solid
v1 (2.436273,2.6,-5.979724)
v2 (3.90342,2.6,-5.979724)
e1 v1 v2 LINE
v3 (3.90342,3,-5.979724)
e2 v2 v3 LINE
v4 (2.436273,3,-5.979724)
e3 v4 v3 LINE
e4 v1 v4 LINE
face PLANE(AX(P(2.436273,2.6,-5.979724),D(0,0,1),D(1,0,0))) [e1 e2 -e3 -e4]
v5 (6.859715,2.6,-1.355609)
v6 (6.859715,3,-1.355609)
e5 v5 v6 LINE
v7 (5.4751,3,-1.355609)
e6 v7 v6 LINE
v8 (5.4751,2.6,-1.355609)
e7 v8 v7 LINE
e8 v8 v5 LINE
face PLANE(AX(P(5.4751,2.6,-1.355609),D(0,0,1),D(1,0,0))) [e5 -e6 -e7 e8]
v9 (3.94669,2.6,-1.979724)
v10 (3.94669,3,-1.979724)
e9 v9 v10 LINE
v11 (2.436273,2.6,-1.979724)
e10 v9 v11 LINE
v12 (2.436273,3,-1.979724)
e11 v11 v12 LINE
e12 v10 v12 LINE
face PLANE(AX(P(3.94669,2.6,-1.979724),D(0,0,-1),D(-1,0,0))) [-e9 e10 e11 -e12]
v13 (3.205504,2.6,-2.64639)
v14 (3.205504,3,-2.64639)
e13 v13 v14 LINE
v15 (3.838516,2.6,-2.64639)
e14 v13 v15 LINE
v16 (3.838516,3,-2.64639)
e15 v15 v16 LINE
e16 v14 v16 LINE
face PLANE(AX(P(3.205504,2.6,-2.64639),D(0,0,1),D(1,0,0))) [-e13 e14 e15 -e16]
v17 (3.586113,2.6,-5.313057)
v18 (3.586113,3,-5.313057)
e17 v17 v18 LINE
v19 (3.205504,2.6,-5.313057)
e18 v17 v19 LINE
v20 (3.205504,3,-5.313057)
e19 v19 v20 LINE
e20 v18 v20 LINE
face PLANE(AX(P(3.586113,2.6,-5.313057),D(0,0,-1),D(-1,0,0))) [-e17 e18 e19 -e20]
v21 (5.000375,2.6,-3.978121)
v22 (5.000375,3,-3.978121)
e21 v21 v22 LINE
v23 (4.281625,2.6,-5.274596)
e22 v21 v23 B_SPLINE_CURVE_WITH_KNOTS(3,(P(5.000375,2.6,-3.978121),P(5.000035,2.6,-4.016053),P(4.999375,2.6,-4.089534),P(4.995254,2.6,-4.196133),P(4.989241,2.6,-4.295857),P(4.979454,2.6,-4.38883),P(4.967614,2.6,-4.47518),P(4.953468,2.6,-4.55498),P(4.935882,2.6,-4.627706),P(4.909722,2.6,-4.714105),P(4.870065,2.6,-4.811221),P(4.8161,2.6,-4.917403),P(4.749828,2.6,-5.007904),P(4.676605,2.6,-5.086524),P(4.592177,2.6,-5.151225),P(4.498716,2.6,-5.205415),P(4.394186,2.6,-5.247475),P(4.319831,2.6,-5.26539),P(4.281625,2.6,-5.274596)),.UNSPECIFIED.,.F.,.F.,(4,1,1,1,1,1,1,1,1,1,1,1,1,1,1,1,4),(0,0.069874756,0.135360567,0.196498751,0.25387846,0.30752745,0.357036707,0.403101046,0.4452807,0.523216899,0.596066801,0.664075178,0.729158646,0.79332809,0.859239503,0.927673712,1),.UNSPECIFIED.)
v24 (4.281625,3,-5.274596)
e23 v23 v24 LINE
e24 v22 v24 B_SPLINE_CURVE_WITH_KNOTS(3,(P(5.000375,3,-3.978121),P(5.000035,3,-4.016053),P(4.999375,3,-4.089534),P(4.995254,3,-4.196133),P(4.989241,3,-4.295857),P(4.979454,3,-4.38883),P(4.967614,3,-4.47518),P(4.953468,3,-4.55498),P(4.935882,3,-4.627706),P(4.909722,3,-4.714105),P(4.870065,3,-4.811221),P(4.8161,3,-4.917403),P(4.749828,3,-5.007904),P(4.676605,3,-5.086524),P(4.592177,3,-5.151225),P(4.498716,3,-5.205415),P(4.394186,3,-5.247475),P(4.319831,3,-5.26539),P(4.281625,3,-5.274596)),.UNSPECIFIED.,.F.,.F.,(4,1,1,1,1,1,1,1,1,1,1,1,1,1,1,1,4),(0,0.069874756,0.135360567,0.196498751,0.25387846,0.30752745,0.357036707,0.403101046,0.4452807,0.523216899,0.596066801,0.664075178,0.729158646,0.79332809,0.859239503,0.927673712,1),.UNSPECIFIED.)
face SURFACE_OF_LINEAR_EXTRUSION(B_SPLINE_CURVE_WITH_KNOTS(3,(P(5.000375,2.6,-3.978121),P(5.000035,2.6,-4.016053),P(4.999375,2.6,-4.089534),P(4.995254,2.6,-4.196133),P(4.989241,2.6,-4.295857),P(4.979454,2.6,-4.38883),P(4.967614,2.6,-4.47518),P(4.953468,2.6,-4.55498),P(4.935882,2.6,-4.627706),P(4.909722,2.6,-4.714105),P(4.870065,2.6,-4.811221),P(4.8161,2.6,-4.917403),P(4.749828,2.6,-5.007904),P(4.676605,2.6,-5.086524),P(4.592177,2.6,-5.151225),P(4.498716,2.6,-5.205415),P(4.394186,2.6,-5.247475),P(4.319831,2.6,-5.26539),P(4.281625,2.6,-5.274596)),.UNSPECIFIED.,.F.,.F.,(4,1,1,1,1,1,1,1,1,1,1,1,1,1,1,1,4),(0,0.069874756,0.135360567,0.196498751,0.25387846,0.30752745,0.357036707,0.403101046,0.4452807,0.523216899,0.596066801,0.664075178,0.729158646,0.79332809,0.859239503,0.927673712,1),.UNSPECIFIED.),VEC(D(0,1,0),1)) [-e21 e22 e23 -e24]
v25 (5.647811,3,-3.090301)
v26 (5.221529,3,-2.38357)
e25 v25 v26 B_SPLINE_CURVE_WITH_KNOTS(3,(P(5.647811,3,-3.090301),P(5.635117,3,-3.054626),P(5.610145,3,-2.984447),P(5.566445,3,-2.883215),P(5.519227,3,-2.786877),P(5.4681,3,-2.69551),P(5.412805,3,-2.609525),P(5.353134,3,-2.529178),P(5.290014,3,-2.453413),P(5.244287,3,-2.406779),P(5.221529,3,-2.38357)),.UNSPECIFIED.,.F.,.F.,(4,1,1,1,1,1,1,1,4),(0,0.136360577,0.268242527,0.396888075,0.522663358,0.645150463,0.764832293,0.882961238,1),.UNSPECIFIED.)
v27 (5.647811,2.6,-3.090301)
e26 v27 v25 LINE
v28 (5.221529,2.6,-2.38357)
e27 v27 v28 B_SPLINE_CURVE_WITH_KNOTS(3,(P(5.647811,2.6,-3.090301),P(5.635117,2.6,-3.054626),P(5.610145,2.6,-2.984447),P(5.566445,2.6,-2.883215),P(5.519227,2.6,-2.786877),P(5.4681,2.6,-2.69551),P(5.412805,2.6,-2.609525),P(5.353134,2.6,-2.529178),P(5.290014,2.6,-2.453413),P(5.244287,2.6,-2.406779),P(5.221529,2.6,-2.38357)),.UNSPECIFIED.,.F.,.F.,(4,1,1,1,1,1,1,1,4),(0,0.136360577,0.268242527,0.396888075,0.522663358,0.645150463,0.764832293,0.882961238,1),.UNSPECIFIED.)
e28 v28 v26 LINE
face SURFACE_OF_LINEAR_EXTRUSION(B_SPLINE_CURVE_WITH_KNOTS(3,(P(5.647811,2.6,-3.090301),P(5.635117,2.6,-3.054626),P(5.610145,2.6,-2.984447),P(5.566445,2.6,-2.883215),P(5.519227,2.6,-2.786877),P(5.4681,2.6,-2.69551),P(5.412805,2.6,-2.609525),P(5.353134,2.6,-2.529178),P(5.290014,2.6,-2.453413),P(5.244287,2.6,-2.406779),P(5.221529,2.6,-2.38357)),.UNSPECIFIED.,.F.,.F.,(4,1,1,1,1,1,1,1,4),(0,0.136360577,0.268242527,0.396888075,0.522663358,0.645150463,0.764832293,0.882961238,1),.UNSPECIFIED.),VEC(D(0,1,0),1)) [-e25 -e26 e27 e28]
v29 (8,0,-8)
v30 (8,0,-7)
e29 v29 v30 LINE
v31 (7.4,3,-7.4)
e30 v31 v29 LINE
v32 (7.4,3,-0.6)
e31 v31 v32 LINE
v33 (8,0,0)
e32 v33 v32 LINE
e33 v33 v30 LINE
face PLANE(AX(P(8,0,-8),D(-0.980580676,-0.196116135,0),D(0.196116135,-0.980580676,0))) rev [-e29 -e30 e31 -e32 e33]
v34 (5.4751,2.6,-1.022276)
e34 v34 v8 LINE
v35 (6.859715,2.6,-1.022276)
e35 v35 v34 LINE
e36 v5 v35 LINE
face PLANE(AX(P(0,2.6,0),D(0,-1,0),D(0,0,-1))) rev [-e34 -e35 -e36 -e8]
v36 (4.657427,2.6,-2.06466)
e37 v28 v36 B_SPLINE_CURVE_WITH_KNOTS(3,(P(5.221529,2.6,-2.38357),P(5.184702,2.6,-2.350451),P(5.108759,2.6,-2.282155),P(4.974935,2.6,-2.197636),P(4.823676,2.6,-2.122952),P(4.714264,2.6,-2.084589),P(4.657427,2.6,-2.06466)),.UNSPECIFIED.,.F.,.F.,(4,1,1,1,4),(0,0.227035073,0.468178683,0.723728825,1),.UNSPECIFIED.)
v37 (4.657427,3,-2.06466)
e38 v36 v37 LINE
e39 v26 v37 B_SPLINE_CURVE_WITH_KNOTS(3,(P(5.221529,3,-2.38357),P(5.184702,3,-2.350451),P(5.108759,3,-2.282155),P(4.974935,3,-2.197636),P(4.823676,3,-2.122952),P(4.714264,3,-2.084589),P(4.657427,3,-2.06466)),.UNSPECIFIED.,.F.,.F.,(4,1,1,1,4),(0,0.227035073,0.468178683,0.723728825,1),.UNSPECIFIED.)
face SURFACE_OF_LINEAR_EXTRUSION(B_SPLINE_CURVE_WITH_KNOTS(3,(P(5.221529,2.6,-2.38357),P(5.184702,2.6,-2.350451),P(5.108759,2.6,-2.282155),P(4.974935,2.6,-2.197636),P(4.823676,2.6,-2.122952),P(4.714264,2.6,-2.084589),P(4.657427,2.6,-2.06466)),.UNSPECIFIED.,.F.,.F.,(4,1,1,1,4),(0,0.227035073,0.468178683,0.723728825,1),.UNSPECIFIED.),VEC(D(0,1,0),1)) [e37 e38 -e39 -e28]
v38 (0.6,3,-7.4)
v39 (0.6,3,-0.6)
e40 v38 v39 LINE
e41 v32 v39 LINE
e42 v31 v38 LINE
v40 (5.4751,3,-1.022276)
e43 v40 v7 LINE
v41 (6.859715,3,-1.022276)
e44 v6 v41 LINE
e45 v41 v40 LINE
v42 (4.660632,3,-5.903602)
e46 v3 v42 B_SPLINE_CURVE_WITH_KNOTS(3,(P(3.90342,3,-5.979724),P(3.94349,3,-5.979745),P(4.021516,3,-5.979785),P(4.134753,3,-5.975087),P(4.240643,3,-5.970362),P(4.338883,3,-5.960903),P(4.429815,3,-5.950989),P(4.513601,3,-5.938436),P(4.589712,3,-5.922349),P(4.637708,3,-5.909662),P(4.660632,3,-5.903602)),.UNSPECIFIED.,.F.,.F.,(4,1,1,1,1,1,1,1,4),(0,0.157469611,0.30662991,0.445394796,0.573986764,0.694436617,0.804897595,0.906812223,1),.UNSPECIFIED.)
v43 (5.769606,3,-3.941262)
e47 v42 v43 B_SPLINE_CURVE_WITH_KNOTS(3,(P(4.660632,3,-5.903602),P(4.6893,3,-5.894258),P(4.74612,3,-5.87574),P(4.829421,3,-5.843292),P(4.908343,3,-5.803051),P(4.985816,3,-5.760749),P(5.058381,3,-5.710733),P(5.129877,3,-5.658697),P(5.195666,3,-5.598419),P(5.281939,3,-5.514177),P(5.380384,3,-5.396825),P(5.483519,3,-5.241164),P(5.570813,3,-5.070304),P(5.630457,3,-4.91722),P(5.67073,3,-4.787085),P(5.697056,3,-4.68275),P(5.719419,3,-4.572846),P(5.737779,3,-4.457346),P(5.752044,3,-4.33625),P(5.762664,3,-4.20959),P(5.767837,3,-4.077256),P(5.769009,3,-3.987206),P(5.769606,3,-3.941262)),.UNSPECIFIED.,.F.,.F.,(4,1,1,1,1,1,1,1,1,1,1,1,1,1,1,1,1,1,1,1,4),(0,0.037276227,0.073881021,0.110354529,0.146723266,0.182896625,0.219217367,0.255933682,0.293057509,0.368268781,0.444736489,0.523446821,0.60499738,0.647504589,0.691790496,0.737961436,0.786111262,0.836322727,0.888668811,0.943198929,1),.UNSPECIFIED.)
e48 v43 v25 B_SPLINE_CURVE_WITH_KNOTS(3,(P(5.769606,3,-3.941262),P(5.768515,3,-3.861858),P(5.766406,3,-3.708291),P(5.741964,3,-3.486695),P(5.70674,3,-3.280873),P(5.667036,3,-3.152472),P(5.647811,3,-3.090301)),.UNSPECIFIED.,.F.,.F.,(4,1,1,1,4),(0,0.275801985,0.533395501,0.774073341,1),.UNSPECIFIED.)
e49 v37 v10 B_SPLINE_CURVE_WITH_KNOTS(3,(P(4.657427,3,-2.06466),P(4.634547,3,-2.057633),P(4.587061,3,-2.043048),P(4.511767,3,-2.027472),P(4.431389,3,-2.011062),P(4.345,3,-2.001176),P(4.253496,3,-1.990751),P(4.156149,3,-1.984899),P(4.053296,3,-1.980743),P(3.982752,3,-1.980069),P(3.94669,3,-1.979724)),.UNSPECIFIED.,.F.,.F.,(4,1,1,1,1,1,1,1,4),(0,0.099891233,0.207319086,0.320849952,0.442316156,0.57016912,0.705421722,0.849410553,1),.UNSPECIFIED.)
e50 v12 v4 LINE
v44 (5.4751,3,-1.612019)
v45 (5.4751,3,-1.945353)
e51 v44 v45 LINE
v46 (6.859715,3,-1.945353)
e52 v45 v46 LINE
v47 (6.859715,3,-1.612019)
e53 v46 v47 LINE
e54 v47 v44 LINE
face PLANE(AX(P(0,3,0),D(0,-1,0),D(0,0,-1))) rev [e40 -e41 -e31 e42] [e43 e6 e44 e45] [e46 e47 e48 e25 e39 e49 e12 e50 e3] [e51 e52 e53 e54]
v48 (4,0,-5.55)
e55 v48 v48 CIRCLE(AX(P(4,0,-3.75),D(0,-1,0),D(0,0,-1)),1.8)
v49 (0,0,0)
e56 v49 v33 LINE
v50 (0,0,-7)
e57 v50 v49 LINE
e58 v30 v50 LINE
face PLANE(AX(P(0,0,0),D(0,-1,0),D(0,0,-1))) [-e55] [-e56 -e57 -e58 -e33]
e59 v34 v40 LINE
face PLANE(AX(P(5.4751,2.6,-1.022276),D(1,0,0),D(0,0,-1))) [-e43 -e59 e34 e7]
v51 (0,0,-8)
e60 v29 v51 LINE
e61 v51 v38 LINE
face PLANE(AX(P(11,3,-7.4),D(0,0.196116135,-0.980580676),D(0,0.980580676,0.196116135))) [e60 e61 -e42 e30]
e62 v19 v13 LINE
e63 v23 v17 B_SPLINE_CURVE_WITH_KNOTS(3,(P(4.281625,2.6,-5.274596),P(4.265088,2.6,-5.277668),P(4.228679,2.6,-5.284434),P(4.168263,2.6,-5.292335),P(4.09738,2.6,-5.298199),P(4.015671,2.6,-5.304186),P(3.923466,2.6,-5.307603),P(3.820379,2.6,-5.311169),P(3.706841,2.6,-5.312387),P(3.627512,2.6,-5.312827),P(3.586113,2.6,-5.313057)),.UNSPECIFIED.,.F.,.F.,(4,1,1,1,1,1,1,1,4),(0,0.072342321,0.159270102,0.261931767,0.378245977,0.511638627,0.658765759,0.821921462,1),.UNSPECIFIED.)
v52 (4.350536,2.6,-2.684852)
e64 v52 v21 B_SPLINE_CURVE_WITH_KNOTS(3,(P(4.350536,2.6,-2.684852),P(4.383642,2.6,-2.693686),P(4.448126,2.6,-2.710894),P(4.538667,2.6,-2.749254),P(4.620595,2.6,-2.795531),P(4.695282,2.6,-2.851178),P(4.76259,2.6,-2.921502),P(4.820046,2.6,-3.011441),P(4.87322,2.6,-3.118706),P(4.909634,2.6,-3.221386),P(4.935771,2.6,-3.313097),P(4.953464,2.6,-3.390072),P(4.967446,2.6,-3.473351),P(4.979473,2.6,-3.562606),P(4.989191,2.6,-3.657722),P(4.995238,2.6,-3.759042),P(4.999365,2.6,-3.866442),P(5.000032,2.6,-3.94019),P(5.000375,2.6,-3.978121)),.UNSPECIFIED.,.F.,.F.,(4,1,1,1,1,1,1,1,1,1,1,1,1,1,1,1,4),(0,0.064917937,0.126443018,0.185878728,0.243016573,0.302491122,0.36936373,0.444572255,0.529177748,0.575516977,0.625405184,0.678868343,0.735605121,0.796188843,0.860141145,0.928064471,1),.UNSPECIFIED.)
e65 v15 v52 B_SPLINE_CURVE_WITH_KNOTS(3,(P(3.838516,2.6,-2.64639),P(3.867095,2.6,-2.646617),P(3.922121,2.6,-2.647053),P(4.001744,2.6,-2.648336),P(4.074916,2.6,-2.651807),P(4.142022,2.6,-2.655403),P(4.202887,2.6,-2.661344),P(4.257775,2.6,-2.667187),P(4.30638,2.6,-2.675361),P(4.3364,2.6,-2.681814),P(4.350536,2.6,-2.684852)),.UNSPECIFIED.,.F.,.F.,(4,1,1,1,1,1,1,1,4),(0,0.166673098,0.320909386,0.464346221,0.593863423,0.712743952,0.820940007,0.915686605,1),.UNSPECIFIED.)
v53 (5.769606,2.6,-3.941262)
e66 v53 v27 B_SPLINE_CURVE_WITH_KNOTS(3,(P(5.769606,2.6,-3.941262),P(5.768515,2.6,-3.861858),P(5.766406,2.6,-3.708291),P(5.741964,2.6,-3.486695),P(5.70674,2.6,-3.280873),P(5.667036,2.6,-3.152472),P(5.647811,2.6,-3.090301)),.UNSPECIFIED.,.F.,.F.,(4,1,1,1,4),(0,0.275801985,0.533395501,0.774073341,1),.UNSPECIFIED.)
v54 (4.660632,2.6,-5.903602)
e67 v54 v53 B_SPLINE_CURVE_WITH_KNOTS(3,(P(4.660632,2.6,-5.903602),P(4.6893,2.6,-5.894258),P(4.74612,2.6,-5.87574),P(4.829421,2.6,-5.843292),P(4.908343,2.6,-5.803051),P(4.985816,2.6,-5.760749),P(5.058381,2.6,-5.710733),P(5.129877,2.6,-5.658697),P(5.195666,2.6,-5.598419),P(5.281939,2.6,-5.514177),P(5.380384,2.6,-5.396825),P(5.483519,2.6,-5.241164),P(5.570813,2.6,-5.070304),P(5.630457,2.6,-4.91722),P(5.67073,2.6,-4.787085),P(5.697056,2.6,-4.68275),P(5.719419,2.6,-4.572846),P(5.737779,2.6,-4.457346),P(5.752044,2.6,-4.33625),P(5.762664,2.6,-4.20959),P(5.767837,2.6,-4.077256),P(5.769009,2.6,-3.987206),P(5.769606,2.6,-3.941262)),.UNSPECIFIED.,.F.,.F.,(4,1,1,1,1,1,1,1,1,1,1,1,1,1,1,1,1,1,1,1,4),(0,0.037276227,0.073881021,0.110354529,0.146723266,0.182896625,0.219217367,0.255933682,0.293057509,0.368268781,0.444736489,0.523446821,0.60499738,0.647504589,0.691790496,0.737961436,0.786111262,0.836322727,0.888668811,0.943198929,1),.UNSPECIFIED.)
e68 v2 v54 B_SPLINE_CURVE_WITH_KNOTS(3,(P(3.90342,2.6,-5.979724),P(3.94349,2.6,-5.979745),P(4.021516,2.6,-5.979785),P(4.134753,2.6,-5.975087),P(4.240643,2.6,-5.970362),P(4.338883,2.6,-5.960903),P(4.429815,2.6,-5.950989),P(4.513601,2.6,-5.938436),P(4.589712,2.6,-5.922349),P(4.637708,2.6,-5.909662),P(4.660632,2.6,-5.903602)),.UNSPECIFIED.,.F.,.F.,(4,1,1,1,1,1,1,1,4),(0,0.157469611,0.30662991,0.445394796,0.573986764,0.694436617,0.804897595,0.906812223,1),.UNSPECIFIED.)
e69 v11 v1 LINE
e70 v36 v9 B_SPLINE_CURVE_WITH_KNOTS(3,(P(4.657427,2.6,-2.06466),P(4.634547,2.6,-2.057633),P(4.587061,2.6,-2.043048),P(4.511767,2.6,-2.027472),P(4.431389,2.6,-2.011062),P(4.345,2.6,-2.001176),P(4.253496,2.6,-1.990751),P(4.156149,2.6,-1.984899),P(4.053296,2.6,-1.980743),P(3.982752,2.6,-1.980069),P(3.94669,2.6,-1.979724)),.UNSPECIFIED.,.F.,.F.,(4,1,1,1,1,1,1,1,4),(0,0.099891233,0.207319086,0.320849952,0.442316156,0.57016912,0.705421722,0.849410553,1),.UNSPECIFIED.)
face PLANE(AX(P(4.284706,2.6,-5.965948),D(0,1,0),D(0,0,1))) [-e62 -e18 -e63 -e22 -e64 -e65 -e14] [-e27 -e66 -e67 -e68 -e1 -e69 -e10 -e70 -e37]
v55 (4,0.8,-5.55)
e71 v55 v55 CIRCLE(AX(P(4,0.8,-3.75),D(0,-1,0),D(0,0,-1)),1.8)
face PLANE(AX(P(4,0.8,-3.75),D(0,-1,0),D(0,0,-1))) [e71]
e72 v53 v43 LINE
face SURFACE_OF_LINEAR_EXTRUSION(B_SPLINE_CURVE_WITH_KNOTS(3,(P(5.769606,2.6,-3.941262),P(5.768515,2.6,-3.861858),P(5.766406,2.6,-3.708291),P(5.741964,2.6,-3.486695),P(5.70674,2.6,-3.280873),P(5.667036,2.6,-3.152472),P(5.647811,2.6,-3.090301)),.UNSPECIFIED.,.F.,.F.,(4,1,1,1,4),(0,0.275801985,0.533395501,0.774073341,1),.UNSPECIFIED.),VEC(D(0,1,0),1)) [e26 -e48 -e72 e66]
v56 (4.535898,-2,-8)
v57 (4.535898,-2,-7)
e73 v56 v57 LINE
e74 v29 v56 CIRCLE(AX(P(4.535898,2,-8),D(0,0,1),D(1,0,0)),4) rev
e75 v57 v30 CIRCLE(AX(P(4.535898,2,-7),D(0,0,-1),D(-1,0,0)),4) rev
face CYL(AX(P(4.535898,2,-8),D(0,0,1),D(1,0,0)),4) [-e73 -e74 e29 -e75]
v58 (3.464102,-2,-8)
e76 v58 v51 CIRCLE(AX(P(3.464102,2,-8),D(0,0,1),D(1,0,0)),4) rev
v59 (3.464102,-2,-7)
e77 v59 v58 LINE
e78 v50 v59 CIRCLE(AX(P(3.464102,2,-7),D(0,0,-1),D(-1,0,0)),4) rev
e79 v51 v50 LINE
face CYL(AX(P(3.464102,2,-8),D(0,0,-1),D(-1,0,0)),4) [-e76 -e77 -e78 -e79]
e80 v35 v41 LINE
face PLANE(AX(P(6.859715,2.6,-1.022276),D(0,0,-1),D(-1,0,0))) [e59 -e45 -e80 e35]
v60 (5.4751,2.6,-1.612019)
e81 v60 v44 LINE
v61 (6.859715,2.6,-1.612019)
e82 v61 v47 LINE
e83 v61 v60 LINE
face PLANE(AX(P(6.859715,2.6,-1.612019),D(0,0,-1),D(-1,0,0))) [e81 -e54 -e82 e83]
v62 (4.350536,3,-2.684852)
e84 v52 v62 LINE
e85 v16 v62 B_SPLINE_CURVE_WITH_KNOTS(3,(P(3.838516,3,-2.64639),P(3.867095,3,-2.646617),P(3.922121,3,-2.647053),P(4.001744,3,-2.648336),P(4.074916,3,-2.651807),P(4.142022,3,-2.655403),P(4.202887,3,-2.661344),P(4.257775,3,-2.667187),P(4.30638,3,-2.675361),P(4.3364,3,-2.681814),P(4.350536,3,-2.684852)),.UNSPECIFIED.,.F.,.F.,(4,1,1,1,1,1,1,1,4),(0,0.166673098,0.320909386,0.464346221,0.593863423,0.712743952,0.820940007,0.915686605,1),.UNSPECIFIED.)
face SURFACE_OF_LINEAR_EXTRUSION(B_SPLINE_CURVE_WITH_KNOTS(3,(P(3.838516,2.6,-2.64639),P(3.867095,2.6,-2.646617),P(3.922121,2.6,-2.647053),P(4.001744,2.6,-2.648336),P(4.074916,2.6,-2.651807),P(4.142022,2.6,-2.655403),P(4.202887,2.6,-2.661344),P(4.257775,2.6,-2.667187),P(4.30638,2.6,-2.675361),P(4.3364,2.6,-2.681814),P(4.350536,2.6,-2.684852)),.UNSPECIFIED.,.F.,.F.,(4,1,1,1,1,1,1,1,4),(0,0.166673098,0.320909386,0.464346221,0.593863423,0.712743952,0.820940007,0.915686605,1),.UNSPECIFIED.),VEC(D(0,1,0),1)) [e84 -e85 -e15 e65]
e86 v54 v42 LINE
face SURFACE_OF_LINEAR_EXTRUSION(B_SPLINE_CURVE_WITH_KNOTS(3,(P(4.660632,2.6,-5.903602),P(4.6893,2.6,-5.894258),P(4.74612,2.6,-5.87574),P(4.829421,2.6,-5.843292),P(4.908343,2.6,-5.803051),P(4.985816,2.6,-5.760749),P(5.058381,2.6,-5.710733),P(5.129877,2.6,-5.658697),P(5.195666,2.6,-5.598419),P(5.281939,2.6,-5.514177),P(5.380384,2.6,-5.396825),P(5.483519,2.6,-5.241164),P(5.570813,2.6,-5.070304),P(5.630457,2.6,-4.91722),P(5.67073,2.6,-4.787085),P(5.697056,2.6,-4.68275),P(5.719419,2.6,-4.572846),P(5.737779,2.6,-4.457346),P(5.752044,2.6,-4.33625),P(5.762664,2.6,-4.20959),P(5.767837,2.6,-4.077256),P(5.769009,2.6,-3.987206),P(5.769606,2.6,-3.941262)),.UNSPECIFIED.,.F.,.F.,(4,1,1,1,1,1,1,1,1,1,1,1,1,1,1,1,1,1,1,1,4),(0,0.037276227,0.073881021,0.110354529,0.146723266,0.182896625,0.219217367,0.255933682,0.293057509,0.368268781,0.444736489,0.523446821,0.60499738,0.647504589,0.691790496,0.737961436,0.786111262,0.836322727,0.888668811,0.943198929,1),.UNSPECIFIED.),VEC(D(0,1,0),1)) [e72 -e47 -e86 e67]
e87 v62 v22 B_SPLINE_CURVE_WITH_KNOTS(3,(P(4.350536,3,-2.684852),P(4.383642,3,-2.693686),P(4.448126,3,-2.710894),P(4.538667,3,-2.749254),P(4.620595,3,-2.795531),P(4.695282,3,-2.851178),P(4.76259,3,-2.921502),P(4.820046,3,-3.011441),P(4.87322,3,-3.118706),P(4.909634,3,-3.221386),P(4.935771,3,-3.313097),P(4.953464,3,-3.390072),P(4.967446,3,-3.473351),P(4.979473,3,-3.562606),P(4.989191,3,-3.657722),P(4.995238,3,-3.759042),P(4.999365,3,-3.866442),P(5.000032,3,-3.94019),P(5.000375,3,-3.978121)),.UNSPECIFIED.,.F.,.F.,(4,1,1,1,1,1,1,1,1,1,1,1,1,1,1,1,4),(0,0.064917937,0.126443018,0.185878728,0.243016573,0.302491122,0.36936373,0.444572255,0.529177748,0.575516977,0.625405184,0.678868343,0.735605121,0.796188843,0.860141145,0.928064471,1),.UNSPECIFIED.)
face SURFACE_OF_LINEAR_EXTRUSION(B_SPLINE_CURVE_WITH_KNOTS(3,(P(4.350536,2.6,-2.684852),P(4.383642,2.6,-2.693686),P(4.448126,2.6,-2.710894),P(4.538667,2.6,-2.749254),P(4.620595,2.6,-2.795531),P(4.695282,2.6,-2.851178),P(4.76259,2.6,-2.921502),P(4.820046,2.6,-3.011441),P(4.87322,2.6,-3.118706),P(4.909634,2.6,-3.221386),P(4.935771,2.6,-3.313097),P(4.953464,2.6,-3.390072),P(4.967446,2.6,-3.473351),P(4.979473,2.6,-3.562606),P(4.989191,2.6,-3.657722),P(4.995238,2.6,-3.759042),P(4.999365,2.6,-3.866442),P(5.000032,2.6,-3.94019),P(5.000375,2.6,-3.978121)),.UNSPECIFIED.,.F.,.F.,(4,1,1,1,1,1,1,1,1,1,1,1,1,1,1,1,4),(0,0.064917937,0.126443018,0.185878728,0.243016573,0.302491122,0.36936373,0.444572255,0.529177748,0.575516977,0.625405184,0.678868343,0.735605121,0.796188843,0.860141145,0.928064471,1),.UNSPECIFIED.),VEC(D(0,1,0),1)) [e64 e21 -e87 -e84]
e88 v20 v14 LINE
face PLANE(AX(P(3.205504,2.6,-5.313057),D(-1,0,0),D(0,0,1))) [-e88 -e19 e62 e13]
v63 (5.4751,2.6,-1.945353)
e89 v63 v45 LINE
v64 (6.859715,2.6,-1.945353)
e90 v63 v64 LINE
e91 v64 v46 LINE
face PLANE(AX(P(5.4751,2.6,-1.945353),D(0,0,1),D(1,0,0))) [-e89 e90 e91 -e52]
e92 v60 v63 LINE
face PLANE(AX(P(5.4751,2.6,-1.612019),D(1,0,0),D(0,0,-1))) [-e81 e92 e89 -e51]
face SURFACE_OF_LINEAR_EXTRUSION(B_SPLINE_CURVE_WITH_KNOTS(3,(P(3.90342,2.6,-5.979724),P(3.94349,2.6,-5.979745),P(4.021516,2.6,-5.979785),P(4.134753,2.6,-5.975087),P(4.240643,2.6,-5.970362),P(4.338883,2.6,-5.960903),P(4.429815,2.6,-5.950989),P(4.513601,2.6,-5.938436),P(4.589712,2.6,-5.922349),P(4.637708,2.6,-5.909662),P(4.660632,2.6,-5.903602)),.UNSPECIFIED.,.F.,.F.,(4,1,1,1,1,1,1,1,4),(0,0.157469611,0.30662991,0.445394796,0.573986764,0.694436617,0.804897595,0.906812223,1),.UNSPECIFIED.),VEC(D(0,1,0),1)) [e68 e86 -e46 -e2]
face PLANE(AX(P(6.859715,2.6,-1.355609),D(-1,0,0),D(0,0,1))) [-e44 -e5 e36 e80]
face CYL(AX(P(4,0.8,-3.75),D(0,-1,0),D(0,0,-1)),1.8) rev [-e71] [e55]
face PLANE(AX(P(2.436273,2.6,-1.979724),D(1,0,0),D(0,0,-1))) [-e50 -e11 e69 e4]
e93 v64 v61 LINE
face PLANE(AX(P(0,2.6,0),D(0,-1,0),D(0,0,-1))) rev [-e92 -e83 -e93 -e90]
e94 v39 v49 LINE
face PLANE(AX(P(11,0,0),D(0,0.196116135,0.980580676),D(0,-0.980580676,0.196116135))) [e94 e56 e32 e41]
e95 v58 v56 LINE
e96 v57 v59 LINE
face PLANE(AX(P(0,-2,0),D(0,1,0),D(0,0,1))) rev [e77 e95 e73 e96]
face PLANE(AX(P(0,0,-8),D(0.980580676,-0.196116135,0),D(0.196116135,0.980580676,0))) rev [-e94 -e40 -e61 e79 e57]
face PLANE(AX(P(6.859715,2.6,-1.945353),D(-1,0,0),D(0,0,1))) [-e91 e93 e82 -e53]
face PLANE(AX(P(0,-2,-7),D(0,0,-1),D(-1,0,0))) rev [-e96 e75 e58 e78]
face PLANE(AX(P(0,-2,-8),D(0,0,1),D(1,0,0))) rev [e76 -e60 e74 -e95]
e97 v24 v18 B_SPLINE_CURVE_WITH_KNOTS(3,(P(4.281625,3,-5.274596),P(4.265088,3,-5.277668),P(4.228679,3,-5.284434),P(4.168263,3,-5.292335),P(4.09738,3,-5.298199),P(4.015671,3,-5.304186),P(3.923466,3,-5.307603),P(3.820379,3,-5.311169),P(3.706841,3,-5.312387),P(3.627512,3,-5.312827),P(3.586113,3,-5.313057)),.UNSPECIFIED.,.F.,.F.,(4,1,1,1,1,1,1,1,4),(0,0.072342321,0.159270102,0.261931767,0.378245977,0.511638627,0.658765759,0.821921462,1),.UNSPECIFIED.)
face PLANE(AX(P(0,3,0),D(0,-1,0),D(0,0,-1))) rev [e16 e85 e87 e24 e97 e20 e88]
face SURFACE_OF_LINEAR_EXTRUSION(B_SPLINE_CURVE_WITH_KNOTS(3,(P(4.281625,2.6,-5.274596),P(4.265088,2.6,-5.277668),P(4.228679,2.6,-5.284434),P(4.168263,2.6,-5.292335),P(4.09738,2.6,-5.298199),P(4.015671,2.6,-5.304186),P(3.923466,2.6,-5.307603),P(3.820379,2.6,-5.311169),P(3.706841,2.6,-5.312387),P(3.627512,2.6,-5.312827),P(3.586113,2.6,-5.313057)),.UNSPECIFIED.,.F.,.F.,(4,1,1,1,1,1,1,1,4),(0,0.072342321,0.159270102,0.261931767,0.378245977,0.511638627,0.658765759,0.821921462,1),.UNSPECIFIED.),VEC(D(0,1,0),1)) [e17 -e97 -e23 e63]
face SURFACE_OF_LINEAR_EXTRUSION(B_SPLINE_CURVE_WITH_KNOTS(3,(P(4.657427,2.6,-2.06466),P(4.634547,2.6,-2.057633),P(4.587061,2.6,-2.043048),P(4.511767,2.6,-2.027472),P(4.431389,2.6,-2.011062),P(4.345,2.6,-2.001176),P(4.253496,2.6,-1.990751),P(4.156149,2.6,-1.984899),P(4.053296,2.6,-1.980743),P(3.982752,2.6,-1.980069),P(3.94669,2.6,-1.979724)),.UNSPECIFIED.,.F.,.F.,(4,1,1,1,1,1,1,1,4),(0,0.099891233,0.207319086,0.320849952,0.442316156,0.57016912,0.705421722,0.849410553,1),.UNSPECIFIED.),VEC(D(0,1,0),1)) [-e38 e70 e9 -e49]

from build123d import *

# Parameters (mm, degrees)
SKETCH1_W               = 8
SKETCH1_H               = 8
BOSS_EXTRUDE1_DEPTH     = 3
CUT_EXTRUDE1_DEPTH      = 12.704699911
CUT_EXTRUDE1_DEPTH_BACK = 12.704699911
CUT_EXTRUDE2_DEPTH      = 11
SKETCH4_R               = 1.8
CUT_EXTRUDE3_DEPTH      = 0.8
SKETCH5_W               = 8
SKETCH5_H               = 1
BOSS_EXTRUDE2_DEPTH     = 2
FILLET1_R               = 4
CUT_EXTRUDE4_DEPTH      = 0.4
SKETCH7_W               = 1.384615385
SKETCH7_H               = 0.333333334
CUT_EXTRUDE5_DEPTH      = 0.4


with BuildPart() as part:
    # Sketch1 → Boss-Extrude1 (new body)
    with BuildSketch(Plane(origin=(0, 0, 0), x_dir=(1, 0, 0), z_dir=(0, 1, 0))):
        with Locations((4, 4)):
            Rectangle(SKETCH1_W, SKETCH1_H)
    extrude(amount=BOSS_EXTRUDE1_DEPTH)

    # Sketch2 → Cut-Extrude1 (cut, two sides: drawn at the far end of the back side and taken through both)
    with BuildSketch(Plane.XY.offset(-CUT_EXTRUDE1_DEPTH_BACK)):
        Polygon((0, 0), (0.6, 3), (0, 3), align=None)
        Polygon((8, 0), (7.4, 3), (8, 3), align=None)
    extrude(amount=CUT_EXTRUDE1_DEPTH + CUT_EXTRUDE1_DEPTH_BACK, mode=Mode.SUBTRACT)

    # Sketch3 → Cut-Extrude2 (cut)
    with BuildSketch(Plane(origin=(0, 0, 0), x_dir=(0, 0, -1), z_dir=(1, 0, 0))):
        Polygon((0, 0), (0.6, 3), (0, 3), align=None)
        Polygon((8, 3), (7.4, 3), (8, 0), align=None)
    extrude(amount=CUT_EXTRUDE2_DEPTH, mode=Mode.SUBTRACT)

    # Sketch4 → Cut-Extrude3 (cut)
    with BuildSketch(Plane.XZ):
        with Locations(Location((4, -3.75, 0), (0, 0, 270))):
            Circle(SKETCH4_R)
    extrude(amount=-CUT_EXTRUDE3_DEPTH, mode=Mode.SUBTRACT)

    # Sketch5 → Boss-Extrude2 (add)
    with BuildSketch(Plane.XZ):
        with Locations((4, -7.5)):
            Rectangle(SKETCH5_W, SKETCH5_H)
    extrude(amount=BOSS_EXTRUDE2_DEPTH)

    # Fillet1
    # the kernel refuses this fillet: 4 mm, written as the material it takes off along each edge
    with BuildSketch(Plane(origin=(8, -2, -16.660254038), x_dir=(0, 1, 0), z_dir=(0, 0, 1)), Plane(origin=(0, -2, 1.660254038), x_dir=(0, 1, 0), z_dir=(0, 0, -1))) as fillet1_piece_1:
        with BuildLine():
            CenterArc((4, 3.464101615), FILLET1_R, 180, 60)
            Line((0, 3.464101615), (-0.08, 3.464101615))
            Line((-0.08, 3.464101615), (-0.08, 0))
            Line((-0.08, 0), (0, -0.08))
            ThreePointArc((0, -0.08), (1, -0.08), (1.96, -0.069282032))
            Line((1.96, -0.069282032), (2, 0))
        make_face()
    extrude(amount=18.320508076, mode=Mode.SUBTRACT)

    # Sketch6 → Cut-Extrude4 (cut)
    with BuildSketch(Plane(origin=(0, 3, 0), x_dir=(1, 0, 0), z_dir=(0, 1, 0))):
        with BuildLine():
            Line((2.436272881, 5.979723732), (3.903420317, 5.979723732))
            add(Edge.make_bspline(
                [(3.903420317, 5.979723732), (3.943490496, 5.979744505), (4.021516441, 5.979784954), (4.134752515, 5.975087302), (4.240642802, 5.970362082), (4.338883372, 5.960903224), (4.429815049, 5.950988663), (4.51360101, 5.938436084), (4.589711972, 5.922348579), (4.637707501, 5.909661658), (4.660631856, 5.903601937)],
                knots=[0, 0, 0, 0, 1.259756885, 2.453039283, 3.563158368, 4.591894114, 5.55549294, 6.43918076, 7.254497783, 8, 8, 8, 8], degree=3))
            add(Edge.make_bspline(
                [(4.660631856, 5.903601937), (4.689300162, 5.894258489), (4.74612039, 5.87573989), (4.829420592, 5.843292221), (4.908343197, 5.803050568), (4.985816138, 5.760749105), (5.058380803, 5.710732544), (5.129877456, 5.658697008), (5.195666079, 5.598419283), (5.281939397, 5.514177193), (5.380383811, 5.396825298), (5.483519335, 5.241163905), (5.570813292, 5.070304112), (5.630456537, 4.917219685), (5.670729972, 4.787084992), (5.697056277, 4.682749965), (5.719418871, 4.572846322), (5.737778631, 4.457346355), (5.752043635, 4.336250048), (5.762664083, 4.209589679), (5.767837312, 4.07725583), (5.769008616, 3.987205692), (5.769606215, 3.941262194)],
                knots=[0, 0, 0, 0, 0.745524535, 1.477620414, 2.207090574, 2.934465325, 3.657932502, 4.384347339, 5.118673636, 5.861150177, 7.365375624, 8.894729774, 10.468936425, 12.099947606, 12.950091786, 13.83580991, 14.759228729, 15.722225242, 16.726454549, 17.773376212, 18.863978586, 20, 20, 20, 20], degree=3))
            add(Edge.make_bspline(
                [(5.769606215, 3.941262194), (5.768515323, 3.861857727), (5.766405561, 3.708291084), (5.741963835, 3.486695058), (5.70674022, 3.280872561), (5.667035899, 3.152471539), (5.647811343, 3.090300655)],
                knots=[0, 0, 0, 0, 1.103207939, 2.133582005, 3.096293362, 4, 4, 4, 4], degree=3))
            add(Edge.make_bspline(
                [(5.647811343, 3.090300655), (5.635116766, 3.054625647), (5.610144552, 2.98444734), (5.566445051, 2.883214788), (5.519227431, 2.786877042), (5.468100041, 2.695510004), (5.412804571, 2.609524646), (5.353134197, 2.529178156), (5.290013855, 2.453412746), (5.244286819, 2.406778778), (5.221529292, 2.383569886)],
                knots=[0, 0, 0, 0, 1.090884612, 2.145940218, 3.175104604, 4.181306866, 5.161203701, 6.118658341, 7.063689906, 8, 8, 8, 8], degree=3))
            add(Edge.make_bspline(
                [(5.221529292, 2.383569886), (5.184702113, 2.350450915), (5.108759222, 2.282154876), (4.974934842, 2.197635799), (4.823675662, 2.122952418), (4.714264019, 2.084588805), (4.657426727, 2.06465963)],
                knots=[0, 0, 0, 0, 0.908140292, 1.872714733, 2.8949153, 4, 4, 4, 4], degree=3))
            add(Edge.make_bspline(
                [(4.657426727, 2.06465963), (4.634546833, 2.057632533), (4.587060796, 2.043048157), (4.511767003, 2.027471741), (4.431388989, 2.011061834), (4.344999886, 2.001176252), (4.253496453, 1.990751469), (4.156149493, 1.984898536), (4.053296456, 1.980743294), (3.98275208, 1.980068625), (3.946689548, 1.979723732)],
                knots=[0, 0, 0, 0, 0.799129865, 1.658552685, 2.566799617, 3.538529252, 4.561352959, 5.643373779, 6.795284424, 8, 8, 8, 8], degree=3))
            Line((3.946689548, 1.979723732), (2.436272881, 1.979723732))
            Line((2.436272881, 1.979723732), (2.436272881, 5.979723732))
        make_face()
        with BuildLine():
            Line((3.205503651, 5.313057065), (3.205503651, 2.646390399))
            Line((3.205503651, 2.646390399), (3.838516471, 2.646390399))
            add(Edge.make_bspline(
                [(3.838516471, 2.646390399), (3.86709534, 2.646617049), (3.922120581, 2.647053436), (4.001743514, 2.648335709), (4.07491632, 2.651807064), (4.142022322, 2.655402822), (4.202886818, 2.661343643), (4.257774639, 2.667186667), (4.306380252, 2.675360935), (4.336400272, 2.681813595), (4.350535702, 2.684851937)],
                knots=[0, 0, 0, 0, 1.333384787, 2.567275092, 3.714769766, 4.750907381, 5.701951617, 6.567520054, 7.325492842, 8, 8, 8, 8], degree=3))
            add(Edge.make_bspline(
                [(4.350535702, 2.684851937), (4.38364248, 2.693686468), (4.44812575, 2.710893803), (4.538666782, 2.749253907), (4.62059475, 2.795531175), (4.695281698, 2.8511776), (4.762590099, 2.92150181), (4.820046047, 3.011440962), (4.873220012, 3.118706088), (4.909633556, 3.221385639), (4.935771128, 3.313096613), (4.95346412, 3.390071897), (4.967446413, 3.47335137), (4.979473009, 3.562606359), (4.989190784, 3.657722085), (4.995237644, 3.759042029), (4.999364663, 3.866442163), (5.000032135, 3.940189623), (5.000375445, 3.978121168)],
                knots=[0, 0, 0, 0, 1.038686998, 2.023088296, 2.974059649, 3.888265163, 4.839857954, 5.909819677, 7.113156087, 8.466843969, 9.20827164, 10.006482943, 10.861893492, 11.769681931, 12.739021491, 13.762258324, 14.849031541, 16, 16, 16, 16], degree=3))
            add(Edge.make_bspline(
                [(5.000375445, 3.978121168), (5.000034775, 4.01605283), (4.999374834, 4.089533605), (4.995254144, 4.196132914), (4.989241251, 4.29585735), (4.979454269, 4.38883019), (4.967614104, 4.475179926), (4.953468032, 4.554979633), (4.935881696, 4.627705609), (4.909721893, 4.71410541), (4.870064977, 4.811221472), (4.816099655, 4.917402921), (4.749828382, 5.00790436), (4.676605078, 5.08652444), (4.592177372, 5.151224792), (4.498716105, 5.205415106), (4.394186359, 5.247475499), (4.319831067, 5.2653904), (4.281625445, 5.274595527)],
                knots=[0, 0, 0, 0, 1.117996097, 2.165769068, 3.143980016, 4.062055362, 4.920439205, 5.712587309, 6.449616741, 7.124491204, 8.371470382, 9.537068822, 10.625202851, 11.666538334, 12.693249444, 13.747832046, 14.842779399, 16, 16, 16, 16], degree=3))
            add(Edge.make_bspline(
                [(4.281625445, 5.274595527), (4.265088191, 5.27766838), (4.228679487, 5.284433627), (4.168262747, 5.292335475), (4.097380449, 5.298199321), (4.015671249, 5.304185793), (3.923465993, 5.307602683), (3.820378875, 5.311168762), (3.706841263, 5.312386928), (3.627511913, 5.312827267), (3.586112625, 5.313057065)],
                knots=[0, 0, 0, 0, 0.578738571, 1.274160813, 2.095454135, 3.025967819, 4.093109015, 5.270126069, 6.575371698, 8, 8, 8, 8], degree=3))
            Line((3.586112625, 5.313057065), (3.205503651, 5.313057065))
        make_face(mode=Mode.SUBTRACT)
    extrude(amount=-CUT_EXTRUDE4_DEPTH, mode=Mode.SUBTRACT)

    # Sketch7 → Cut-Extrude5 (cut)
    with BuildSketch(Plane(origin=(0, 3, 0), x_dir=(1, 0, 0), z_dir=(0, 1, 0))):
        with Locations((6.167407218, 1.778686134)):
            Rectangle(SKETCH7_W, SKETCH7_H)
        with Locations((6.167407218, 1.188942544)):
            Rectangle(SKETCH7_W, SKETCH7_H)
    extrude(amount=-CUT_EXTRUDE5_DEPTH, mode=Mode.SUBTRACT)


solid = part.part
